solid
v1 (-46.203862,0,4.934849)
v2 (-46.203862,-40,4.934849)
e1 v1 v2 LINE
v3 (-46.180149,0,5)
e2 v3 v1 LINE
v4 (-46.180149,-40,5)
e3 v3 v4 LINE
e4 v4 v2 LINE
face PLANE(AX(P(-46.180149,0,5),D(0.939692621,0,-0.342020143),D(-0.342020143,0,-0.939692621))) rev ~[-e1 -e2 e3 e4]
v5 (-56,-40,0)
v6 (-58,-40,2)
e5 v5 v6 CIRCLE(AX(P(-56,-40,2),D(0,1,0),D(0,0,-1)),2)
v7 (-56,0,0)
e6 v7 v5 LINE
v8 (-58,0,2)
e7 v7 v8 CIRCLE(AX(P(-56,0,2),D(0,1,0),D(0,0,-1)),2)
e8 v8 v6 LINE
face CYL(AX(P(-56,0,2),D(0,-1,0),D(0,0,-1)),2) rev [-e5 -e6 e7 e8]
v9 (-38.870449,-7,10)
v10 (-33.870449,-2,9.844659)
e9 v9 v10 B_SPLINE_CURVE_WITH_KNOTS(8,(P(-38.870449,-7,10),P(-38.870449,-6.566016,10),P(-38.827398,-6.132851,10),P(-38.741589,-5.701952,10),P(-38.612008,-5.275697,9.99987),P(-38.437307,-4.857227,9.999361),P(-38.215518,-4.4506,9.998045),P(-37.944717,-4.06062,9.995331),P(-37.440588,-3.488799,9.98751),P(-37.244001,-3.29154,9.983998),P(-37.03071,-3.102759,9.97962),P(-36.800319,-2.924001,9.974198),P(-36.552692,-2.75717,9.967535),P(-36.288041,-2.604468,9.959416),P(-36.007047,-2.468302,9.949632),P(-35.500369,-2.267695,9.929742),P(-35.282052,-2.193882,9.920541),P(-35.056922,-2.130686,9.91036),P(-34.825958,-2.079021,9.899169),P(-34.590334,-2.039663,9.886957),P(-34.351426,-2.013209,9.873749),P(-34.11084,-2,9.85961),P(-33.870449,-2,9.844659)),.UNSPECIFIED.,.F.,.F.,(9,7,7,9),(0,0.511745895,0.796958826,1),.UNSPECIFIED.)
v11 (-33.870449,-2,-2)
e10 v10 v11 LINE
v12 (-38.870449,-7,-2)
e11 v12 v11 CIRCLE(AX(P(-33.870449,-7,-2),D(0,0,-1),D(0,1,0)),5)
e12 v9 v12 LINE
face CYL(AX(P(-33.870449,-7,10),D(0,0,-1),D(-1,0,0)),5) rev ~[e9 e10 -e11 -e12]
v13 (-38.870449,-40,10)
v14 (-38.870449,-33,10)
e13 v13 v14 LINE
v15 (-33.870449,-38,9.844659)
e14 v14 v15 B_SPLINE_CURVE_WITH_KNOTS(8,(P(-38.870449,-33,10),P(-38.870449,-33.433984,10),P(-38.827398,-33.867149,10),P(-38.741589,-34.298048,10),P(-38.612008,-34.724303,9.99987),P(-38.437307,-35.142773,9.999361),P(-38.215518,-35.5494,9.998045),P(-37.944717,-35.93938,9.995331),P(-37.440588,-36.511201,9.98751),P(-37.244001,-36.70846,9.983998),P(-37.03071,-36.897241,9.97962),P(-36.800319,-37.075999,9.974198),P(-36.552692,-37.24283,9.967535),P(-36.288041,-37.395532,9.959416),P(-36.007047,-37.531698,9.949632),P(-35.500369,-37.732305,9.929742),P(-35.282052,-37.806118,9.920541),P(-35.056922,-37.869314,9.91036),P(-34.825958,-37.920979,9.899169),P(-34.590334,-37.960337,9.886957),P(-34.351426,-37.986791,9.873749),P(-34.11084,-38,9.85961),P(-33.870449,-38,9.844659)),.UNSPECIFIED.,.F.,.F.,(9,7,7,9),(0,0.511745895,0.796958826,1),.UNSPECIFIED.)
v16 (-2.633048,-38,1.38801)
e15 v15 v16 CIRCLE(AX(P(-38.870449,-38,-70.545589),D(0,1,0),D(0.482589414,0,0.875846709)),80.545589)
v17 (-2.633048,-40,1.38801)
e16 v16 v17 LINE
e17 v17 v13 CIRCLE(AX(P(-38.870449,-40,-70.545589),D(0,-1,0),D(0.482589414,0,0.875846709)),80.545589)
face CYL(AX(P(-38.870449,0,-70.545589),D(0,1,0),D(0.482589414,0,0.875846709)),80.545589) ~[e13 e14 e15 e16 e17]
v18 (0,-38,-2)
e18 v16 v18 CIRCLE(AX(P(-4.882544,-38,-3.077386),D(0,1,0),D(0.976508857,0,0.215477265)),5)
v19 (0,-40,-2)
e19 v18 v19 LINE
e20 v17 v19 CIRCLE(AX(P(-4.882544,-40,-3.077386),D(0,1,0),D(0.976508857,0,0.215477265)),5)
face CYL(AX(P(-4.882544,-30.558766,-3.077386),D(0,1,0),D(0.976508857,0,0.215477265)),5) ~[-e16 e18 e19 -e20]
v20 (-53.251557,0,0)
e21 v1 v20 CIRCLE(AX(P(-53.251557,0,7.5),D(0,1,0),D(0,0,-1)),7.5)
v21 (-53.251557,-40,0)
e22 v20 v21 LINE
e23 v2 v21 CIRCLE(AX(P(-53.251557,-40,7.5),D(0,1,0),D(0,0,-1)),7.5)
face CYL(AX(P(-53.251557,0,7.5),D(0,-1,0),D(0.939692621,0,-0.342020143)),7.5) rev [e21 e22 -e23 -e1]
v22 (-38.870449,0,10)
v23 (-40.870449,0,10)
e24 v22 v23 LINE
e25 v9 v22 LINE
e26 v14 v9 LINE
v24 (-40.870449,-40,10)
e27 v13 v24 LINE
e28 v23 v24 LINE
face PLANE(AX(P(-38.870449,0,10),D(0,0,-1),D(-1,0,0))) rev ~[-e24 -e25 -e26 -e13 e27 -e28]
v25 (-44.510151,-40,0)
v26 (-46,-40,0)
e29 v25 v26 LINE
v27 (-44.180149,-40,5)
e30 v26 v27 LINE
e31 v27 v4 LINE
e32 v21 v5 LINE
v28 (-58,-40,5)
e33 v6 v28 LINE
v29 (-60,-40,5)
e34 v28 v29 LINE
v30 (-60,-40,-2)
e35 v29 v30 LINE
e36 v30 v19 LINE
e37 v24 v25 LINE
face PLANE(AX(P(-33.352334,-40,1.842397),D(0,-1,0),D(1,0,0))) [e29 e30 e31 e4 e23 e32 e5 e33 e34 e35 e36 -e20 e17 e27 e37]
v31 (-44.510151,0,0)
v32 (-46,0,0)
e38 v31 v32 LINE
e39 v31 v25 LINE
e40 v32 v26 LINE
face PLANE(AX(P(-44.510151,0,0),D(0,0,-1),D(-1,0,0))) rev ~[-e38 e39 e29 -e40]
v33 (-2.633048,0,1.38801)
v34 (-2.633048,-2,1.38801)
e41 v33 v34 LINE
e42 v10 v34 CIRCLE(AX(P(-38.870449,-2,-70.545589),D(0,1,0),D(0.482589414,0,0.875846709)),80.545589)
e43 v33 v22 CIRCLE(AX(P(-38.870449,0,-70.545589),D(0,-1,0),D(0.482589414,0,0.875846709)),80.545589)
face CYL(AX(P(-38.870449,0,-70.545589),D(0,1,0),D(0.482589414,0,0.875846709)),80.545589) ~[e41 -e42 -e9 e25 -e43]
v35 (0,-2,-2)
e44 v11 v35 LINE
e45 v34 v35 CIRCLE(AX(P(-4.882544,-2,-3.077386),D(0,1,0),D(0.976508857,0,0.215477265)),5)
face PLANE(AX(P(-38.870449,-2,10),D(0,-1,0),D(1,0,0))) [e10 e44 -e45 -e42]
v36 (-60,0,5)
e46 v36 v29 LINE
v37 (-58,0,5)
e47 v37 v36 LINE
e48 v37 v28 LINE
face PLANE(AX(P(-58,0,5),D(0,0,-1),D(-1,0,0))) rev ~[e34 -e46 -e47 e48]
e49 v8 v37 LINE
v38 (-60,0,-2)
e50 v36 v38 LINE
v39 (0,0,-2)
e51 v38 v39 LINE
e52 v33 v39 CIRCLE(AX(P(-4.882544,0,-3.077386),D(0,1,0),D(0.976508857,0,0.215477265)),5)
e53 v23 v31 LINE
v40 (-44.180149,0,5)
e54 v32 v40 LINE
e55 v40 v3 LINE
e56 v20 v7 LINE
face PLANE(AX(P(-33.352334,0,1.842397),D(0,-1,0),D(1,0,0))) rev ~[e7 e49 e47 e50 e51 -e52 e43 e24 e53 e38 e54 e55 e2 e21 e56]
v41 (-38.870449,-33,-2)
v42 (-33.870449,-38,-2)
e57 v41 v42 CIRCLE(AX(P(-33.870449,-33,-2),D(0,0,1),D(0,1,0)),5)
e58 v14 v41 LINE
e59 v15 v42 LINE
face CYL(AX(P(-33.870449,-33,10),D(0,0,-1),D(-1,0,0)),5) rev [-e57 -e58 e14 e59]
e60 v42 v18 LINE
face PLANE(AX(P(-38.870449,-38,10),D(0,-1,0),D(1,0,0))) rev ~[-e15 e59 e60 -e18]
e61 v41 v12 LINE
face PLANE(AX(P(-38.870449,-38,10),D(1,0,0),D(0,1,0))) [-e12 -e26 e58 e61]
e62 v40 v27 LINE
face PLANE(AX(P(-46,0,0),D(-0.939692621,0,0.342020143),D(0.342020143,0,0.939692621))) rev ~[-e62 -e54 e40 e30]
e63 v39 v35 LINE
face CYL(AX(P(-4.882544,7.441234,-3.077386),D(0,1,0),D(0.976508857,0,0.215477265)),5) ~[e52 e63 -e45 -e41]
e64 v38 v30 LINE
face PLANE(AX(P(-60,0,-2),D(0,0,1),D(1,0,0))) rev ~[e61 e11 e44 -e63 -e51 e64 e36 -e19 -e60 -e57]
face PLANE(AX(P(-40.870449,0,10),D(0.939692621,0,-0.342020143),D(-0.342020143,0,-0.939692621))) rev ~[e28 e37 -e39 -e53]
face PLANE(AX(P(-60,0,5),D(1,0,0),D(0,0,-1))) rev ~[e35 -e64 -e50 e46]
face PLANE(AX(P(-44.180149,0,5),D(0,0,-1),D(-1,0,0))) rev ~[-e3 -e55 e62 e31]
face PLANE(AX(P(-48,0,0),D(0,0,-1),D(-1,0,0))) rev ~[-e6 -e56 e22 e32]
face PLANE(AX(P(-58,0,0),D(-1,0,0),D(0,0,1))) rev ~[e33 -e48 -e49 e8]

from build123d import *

# Parameters (mm, degrees)
F1_DEPTH    = 40
F2_W        = 38.8704487759
F2_H        = 36
F3_DEPTH    = 25
F4_R        = 7.5
F5_R        = 2
F6_T1_DEPTH = 16.8824680596
F6_T3_DEPTH = 16.8824680596
F7_R        = 5


# Not quite as in the source:
# - a fillet or chamfer that OpenCascade refuses, or shapes differently, is made with other operations: its cross-section is extruded or revolved along the edge and cut away or added


with BuildPart() as f1:
    # F0 (on Front) → F1 (new body)
    with BuildSketch(Plane.XZ):
        with BuildLine():
            Line((0, -2), (0, 0))
            ThreePointArc((0, 0), (-18.8023659823, 7.4599490238), (-38.8704487759, 10))
            Line((-38.8704487759, 10), (-40.8704487759, 10))
            Line((-40.8704487759, 10), (-44.5101511185, 0))
            Line((-44.5101511185, 0), (-46, 0))
            Line((-46, 0), (-44.1801488287, 5))
            Line((-44.1801488287, 5), (-46.1801488287, 5))
            Line((-46.1801488287, 5), (-48, 0))
            Line((-48, 0), (-58, 0))
            Line((-58, 0), (-58, 5))
            Line((-58, 5), (-60, 5))
            Line((-60, 5), (-60, -2))
            Line((-60, -2), (0, -2))
        make_face()
    extrude(amount=F1_DEPTH)

    # F2 (on face) → F3 (cut)
    with BuildSketch(Plane.XY.offset(10)):
        with Locations((-19.4352243879, -20)):
            Rectangle(F2_W, F2_H)
    extrude(amount=-F3_DEPTH, mode=Mode.SUBTRACT)

    # F4
    f4_edges = [f1.edges().sort_by_distance(p)[0] for p in [
        (-48, -20, 0),
    ]]
    fillet(f4_edges, radius=F4_R)

    # F5
    f5_edges = [f1.edges().sort_by_distance(p)[0] for p in [
        (-58, -20, 0),
    ]]
    fillet(f5_edges, radius=F5_R)

    # F6: fillet of radius 5 on 2 edges, made by hand

    # F6_s2 → F6_t1 (cut)
    with BuildSketch(Plane.XZ.offset(30.5587659702)):
        with BuildLine():
            ThreePointArc((0, -2), (-0.9346139409, -0.0091871804), (-2.6330480047, 1.3880102401))
            ThreePointArc((-2.6330480047, 1.3880102401), (-1.3101118631, 0.7061689139), (0, 0))
            Line((0, 0), (0, -2))
        make_face()
    extrude(amount=F6_T1_DEPTH, mode=Mode.SUBTRACT)

    # F6_s4 → F6_t3 (cut)
    with BuildSketch(Plane.XZ.offset(-7.4412340298)):
        with BuildLine():
            ThreePointArc((0, -2), (-0.9346139409, -0.0091871804), (-2.6330480047, 1.3880102401))
            ThreePointArc((-2.6330480047, 1.3880102401), (-1.3101118631, 0.7061689139), (0, 0))
            Line((0, 0), (0, -2))
        make_face()
    extrude(amount=F6_T3_DEPTH, mode=Mode.SUBTRACT)

    # F7
    f7_edges = [f1.edges().sort_by_distance(p)[0] for p in [
        (-38.870449, -38, 4),
        (-38.870449, -2, 4),
    ]]
    fillet(f7_edges, radius=F7_R)


solid = f1.part
